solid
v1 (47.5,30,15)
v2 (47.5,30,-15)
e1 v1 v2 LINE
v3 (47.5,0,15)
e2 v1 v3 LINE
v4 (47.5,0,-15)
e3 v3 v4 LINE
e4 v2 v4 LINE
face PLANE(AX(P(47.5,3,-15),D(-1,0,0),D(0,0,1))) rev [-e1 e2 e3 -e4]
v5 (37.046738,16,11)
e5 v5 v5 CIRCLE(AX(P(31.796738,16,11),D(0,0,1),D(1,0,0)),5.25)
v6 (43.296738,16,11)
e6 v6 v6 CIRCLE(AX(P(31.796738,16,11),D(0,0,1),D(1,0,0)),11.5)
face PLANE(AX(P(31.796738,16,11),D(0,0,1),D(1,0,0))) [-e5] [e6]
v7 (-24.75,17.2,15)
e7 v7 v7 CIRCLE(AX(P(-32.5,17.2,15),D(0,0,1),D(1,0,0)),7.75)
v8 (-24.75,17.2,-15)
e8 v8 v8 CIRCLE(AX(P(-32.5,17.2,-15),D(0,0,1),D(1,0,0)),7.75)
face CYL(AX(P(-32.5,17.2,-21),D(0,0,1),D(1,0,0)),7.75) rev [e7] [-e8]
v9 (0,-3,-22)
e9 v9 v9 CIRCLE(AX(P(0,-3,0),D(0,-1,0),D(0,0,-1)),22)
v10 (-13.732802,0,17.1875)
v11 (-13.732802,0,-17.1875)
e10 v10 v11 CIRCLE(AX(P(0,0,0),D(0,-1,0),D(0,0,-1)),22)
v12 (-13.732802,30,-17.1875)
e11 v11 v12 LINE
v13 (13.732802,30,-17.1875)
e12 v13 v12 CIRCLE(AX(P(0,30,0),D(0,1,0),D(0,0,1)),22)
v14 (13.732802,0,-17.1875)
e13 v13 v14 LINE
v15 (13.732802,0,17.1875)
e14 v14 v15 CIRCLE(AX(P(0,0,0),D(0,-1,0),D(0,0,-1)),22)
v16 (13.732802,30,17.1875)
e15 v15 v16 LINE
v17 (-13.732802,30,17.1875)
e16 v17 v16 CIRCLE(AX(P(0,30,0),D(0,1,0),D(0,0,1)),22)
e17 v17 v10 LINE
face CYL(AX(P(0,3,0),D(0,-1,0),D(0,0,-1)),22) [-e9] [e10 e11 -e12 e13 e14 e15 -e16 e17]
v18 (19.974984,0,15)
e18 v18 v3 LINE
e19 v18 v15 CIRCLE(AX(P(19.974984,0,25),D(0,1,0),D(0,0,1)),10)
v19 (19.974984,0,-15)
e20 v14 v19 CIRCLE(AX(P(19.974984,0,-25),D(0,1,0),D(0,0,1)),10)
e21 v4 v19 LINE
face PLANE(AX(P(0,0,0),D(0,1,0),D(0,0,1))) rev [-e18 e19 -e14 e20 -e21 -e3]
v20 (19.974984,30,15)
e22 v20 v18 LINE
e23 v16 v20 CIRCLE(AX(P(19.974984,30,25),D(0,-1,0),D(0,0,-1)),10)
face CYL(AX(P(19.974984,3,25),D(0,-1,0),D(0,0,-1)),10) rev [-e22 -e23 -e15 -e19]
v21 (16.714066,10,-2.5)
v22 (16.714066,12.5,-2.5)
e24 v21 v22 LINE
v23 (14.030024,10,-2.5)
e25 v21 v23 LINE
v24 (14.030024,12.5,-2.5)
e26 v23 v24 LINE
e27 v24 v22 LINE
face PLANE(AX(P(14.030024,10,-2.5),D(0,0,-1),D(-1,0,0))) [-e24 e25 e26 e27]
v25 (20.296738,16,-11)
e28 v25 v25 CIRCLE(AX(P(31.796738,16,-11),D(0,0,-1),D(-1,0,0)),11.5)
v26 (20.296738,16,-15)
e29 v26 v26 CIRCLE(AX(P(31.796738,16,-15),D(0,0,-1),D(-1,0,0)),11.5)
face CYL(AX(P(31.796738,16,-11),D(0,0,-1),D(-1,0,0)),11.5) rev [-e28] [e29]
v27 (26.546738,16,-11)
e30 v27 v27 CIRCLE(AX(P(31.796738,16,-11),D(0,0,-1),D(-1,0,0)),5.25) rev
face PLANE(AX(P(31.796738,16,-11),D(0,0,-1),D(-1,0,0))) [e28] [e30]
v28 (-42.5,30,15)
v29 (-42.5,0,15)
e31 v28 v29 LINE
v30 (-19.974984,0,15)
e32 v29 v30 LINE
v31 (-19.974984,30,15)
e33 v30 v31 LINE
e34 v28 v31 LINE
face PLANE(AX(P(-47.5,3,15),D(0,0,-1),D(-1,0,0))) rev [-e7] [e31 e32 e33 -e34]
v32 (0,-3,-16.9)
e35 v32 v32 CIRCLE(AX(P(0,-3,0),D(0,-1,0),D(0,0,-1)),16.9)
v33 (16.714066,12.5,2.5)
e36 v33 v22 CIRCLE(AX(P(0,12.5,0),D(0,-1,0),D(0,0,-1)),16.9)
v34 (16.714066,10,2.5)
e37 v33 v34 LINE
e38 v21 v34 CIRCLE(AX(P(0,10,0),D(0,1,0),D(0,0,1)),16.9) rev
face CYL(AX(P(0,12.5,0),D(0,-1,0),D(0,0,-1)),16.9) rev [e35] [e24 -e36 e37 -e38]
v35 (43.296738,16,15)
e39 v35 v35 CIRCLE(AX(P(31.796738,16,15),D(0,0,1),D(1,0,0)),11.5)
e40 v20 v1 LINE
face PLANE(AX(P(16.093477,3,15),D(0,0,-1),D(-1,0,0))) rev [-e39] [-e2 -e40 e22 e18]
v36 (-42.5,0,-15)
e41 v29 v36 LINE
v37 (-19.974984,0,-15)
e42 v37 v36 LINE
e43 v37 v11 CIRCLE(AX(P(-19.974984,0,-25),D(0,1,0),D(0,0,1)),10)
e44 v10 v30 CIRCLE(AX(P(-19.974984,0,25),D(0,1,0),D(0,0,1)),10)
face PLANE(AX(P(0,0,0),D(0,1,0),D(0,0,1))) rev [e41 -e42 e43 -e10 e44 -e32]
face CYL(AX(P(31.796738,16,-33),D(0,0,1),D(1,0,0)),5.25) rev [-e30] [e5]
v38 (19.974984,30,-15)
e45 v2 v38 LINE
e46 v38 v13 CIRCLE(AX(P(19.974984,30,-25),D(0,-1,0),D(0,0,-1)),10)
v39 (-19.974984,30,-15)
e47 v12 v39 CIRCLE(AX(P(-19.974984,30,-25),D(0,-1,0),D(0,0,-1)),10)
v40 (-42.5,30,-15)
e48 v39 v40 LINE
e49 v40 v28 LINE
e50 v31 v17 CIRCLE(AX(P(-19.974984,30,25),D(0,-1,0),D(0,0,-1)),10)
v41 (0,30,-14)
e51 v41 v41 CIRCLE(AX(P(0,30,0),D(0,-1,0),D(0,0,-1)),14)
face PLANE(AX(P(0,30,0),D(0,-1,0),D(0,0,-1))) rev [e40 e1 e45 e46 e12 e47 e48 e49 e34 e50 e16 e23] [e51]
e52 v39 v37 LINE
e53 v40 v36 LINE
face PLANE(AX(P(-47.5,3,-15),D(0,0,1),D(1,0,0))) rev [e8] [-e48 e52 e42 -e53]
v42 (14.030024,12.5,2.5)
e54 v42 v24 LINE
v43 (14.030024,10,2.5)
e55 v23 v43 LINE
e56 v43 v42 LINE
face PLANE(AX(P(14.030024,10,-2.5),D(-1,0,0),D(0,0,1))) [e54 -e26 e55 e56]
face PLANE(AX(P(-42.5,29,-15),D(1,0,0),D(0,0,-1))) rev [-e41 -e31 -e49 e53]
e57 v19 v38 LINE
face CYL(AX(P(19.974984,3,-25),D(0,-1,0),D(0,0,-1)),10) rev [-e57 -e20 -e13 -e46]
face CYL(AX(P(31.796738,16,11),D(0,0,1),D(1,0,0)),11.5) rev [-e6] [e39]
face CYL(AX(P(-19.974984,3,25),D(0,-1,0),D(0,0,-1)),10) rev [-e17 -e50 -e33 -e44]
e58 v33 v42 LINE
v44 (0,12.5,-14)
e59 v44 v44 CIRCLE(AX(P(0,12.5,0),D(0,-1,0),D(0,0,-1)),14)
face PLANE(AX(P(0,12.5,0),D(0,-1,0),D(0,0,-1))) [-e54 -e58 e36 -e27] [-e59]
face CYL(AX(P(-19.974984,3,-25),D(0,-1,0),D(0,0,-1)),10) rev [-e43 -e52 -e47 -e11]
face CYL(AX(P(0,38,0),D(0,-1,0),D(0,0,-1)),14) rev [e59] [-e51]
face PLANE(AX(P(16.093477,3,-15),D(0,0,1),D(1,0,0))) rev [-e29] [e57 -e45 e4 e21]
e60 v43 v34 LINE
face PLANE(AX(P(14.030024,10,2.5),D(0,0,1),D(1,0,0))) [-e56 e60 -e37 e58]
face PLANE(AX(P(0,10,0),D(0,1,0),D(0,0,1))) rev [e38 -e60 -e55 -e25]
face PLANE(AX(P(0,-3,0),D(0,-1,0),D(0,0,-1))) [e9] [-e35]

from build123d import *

# Parameters (mm, degrees)
BOSS_EXTRUDE2_DEPTH  = 3
SKETCH3_W            = 20
SKETCH3_H            = 30
BOSS_EXTRUDE5_DEPTH  = 26
SKETCH8_R            = 7.75
CUT_EXTRUDE2_DEPTH   = 36
BOSS_EXTRUDE7_DEPTH  = 27
SKETCH14_R           = 22
BOSS_EXTRUDE8_DEPTH  = 20
SKETCH16_R           = 11.5
CUT_EXTRUDE3_DEPTH   = 4
SKETCH17_R           = 5.25
CUT_EXTRUDE4_DEPTH   = 44
CUT_EXTRUDE5_START   = -4
SKETCH18_R           = 11.5
CUT_EXTRUDE5_DEPTH   = 4
SKETCH24_W           = 6.849841191
SKETCH24_H           = 4
BOSS_EXTRUDE12_DEPTH = 13
SKETCH26_W           = 5
SKETCH26_H           = 30
CUT_EXTRUDE10_DEPTH  = 6
SKETCH27_R           = 22
BOSS_EXTRUDE15_DEPTH = 7
BOSS_EXTRUDE17_DEPTH = 27
SKETCH37_W           = 20
SKETCH37_H           = 30
BOSS_EXTRUDE18_DEPTH = 1
FILLET17_R           = 10
BOSS_EXTRUDE19_START = 3
SKETCH41_R           = 22
BOSS_EXTRUDE19_DEPTH = 3
SKETCH44_W           = 5.842947404
SKETCH44_H           = 4
BOSS_EXTRUDE21_DEPTH = 22
SKETCH46_R           = 16.9
CUT_EXTRUDE11_DEPTH  = 15.5
SKETCH48_R           = 14
CUT_EXTRUDE13_DEPTH  = 25.5
SKETCH49_W           = 5.321549717
SKETCH49_H           = 5
BOSS_EXTRUDE24_DEPTH = 20


with BuildPart() as part:
    # Sketch1 → Boss-Extrude2 (new body)
    with BuildSketch(Plane(origin=(0, 0, 0), x_dir=(1, 0, 0), z_dir=(0, 1, 0))):
        with BuildLine():
            Line((16.093476939, 15), (47.5, 15))
            Line((47.5, 15), (47.5, -15))
            Line((47.5, -15), (16.093476939, -15))
            ThreePointArc((16.093476939, -15), (0, -22), (-16.093476939, -15))
            Line((-16.093476939, -15), (-47.5, -15))
            Line((-47.5, -15), (-47.5, 15))
            Line((-47.5, 15), (-16.093476939, 15))
            ThreePointArc((-16.093476939, 15), (0, 22), (16.093476939, 15))
        make_face()
    extrude(amount=BOSS_EXTRUDE2_DEPTH)

    # Sketch3 → Boss-Extrude5 (add)
    with BuildSketch(Plane(origin=(0, 3, 0), x_dir=(1, 0, 0), z_dir=(0, 1, 0))):
        with Locations((-32.5, 0)):
            Rectangle(SKETCH3_W, SKETCH3_H)
    extrude(amount=BOSS_EXTRUDE5_DEPTH)

    # Sketch8 → Cut-Extrude2 (cut)
    with BuildSketch(Plane.XY.offset(15)):
        with Locations((-32.5, 17.2)):
            Circle(SKETCH8_R)
    extrude(amount=-CUT_EXTRUDE2_DEPTH, mode=Mode.SUBTRACT)

    # Sketch9 → Boss-Extrude7 (add)
    with BuildSketch(Plane(origin=(0, 3, 0), x_dir=(1, 0, 0), z_dir=(0, 1, 0))):
        with BuildLine():
            Line((16.093476939, 15), (47.5, 15))
            Line((47.5, 15), (47.5, -15))
            Line((47.5, -15), (16.093476939, -15))
            ThreePointArc((16.093476939, -15), (22, 0), (16.093476939, 15))
        make_face()
    extrude(amount=BOSS_EXTRUDE7_DEPTH)

    # Sketch14 → Boss-Extrude8 (add)
    with BuildSketch(Plane(origin=(0, 3, 0), x_dir=(1, 0, 0), z_dir=(0, 1, 0))):
        Circle(SKETCH14_R)
    extrude(amount=BOSS_EXTRUDE8_DEPTH)

    # Sketch16 → Cut-Extrude3 (cut)
    with BuildSketch(Plane.XY.offset(15)):
        with Locations((31.79673847, 16)):
            Circle(SKETCH16_R)
    extrude(amount=-CUT_EXTRUDE3_DEPTH, mode=Mode.SUBTRACT)

    # Sketch17 → Cut-Extrude4 (cut)
    with BuildSketch(Plane.XY.offset(11)):
        with Locations((31.79673847, 16)):
            Circle(SKETCH17_R)
    extrude(amount=-CUT_EXTRUDE4_DEPTH, mode=Mode.SUBTRACT)

    # Sketch18 → Cut-Extrude5 (cut)
    with BuildSketch(Plane(origin=(0, 0, -15), x_dir=(-1, 0, 0), z_dir=(0, 0, -1)).offset(CUT_EXTRUDE5_START)):
        with Locations(Location((-31.79673847, 16, 0), (0, 0, 180))):
            Circle(SKETCH18_R)
    extrude(amount=CUT_EXTRUDE5_DEPTH, mode=Mode.SUBTRACT)

    # Sketch24 → Boss-Extrude12 (add)
    with BuildSketch(Plane(origin=(0, 23, 0), x_dir=(1, 0, 0), z_dir=(0, 1, 0))):
        with Locations((17.924920596, 0)):
            Rectangle(SKETCH24_W, SKETCH24_H)
    extrude(amount=-BOSS_EXTRUDE12_DEPTH)

    # Sketch26 → Cut-Extrude10 (cut)
    with BuildSketch(Plane(origin=(0, 3, 0), x_dir=(1, 0, 0), z_dir=(0, 1, 0))):
        with Locations((-45, 0)):
            Rectangle(SKETCH26_W, SKETCH26_H)
    extrude(amount=-CUT_EXTRUDE10_DEPTH, mode=Mode.SUBTRACT)

    # Sketch27 → Boss-Extrude15 (add)
    with BuildSketch(Plane(origin=(0, 23, 0), x_dir=(1, 0, 0), z_dir=(0, 1, 0))):
        Circle(SKETCH27_R)
    extrude(amount=BOSS_EXTRUDE15_DEPTH)

    # Sketch36 → Boss-Extrude17 (add)
    with BuildSketch(Plane(origin=(0, 3, 0), x_dir=(1, 0, 0), z_dir=(0, 1, 0))):
        with BuildLine():
            Line((-16.093476939, -15), (-22.5, -15))
            Line((-22.5, -15), (-22.5, 15))
            Line((-22.5, 15), (-16.093476939, 15))
            ThreePointArc((-16.093476939, 15), (-22, 0), (-16.093476939, -15))
        make_face()
    extrude(amount=BOSS_EXTRUDE17_DEPTH)

    # Sketch37 → Boss-Extrude18 (add)
    with BuildSketch(Plane(origin=(0, 29, 0), x_dir=(1, 0, 0), z_dir=(0, 1, 0))):
        with Locations((-32.5, 0)):
            Rectangle(SKETCH37_W, SKETCH37_H)
    extrude(amount=BOSS_EXTRUDE18_DEPTH)

    # Fillet17
    # the kernel refuses this fillet: 10 mm, written as the material it adds along each edge
    with BuildSketch(Plane(origin=(16.093476939, 3, 15), x_dir=(-0.7334988970942886, 0, 0.67969064136669), z_dir=(0, 1, 0))) as fillet17_piece_1:
        with BuildLine():
            CenterArc((3.949825005, 9.973213236), FILLET17_R, 227.180526604, 38.624832873)
            Line((-2.847081409, 2.638224265), (0, 0))
            ThreePointArc((0, 0), (1.609187965, 0.058930881), (3.21837593, 0))
        make_face()
    extrude(amount=20)
    with BuildSketch(Plane(origin=(-16.093476939, 3, 15), x_dir=(-1, 0, 0), z_dir=(0, 1, 0)), Plane(origin=(16.093476939, 3, -15), x_dir=(1, 0, 0), z_dir=(0, 1, 0))) as fillet17_piece_2:
        with BuildLine():
            CenterArc((3.881507416, 10), FILLET17_R, 231.375167127, 38.624832873)
            ThreePointArc((-2.360675195, 2.1875), (-1.140282829, 1.136975736), (0, 0))
            Line((0, 0), (3.881507416, 0))
        make_face()
    extrude(amount=20)
    with BuildSketch(Plane(origin=(-16.093476939, 3, -15), x_dir=(-1, 0, 0), z_dir=(0, 1, 0))) as fillet17_piece_3:
        with BuildLine():
            CenterArc((3.881507416, -10), FILLET17_R, 90, 38.624832873)
            ThreePointArc((-2.360675195, -2.1875), (-1.140282829, -1.136975736), (0, 0))
            Line((0, 0), (3.881507416, 0))
        make_face()
    extrude(amount=20)
    with BuildSketch(Plane(origin=(16.093476939, 0, -15), x_dir=(1, 0, 0), z_dir=(0, 1, 0)), Plane(origin=(-16.093476939, 0, 15), x_dir=(-1, 0, 0), z_dir=(0, 1, 0))) as fillet17_piece_4:
        with BuildLine():
            CenterArc((3.881507416, 10), FILLET17_R, 231.375167127, 38.624832873)
            ThreePointArc((-2.360675195, 2.1875), (-1.140282829, 1.136975736), (0, 0))
            Line((0, 0), (3.881507416, 0))
        make_face()
    extrude(amount=3)
    with BuildSketch(Plane(origin=(16.093476939, 23, -15), x_dir=(1, 0, 0), z_dir=(0, 1, 0)), Plane(origin=(-16.093476939, 23, 15), x_dir=(-1, 0, 0), z_dir=(0, 1, 0))) as fillet17_piece_5:
        with BuildLine():
            CenterArc((3.881507416, 10), FILLET17_R, 231.375167127, 38.624832873)
            ThreePointArc((-2.360675195, 2.1875), (-1.140282829, 1.136975736), (0, 0))
            Line((0, 0), (3.881507416, 0))
        make_face()
    extrude(amount=7)
    with BuildSketch(Plane(origin=(-16.093476939, 0, -15), x_dir=(0.7334988970942858, 0, -0.6796906413666929), z_dir=(0, 1, 0)), Plane(origin=(16.093476939, 0, 15), x_dir=(-0.7334988970942886, 0, 0.6796906413666898), z_dir=(0, 1, 0))) as fillet17_piece_6:
        with BuildLine():
            CenterArc((3.949825005, 9.973213236), FILLET17_R, 227.180526604, 38.624832873)
            Line((-2.847081409, 2.638224265), (0, 0))
            ThreePointArc((0, 0), (1.609187965, 0.058930881), (3.21837593, 0))
        make_face()
    extrude(amount=3)
    with BuildSketch(Plane(origin=(-16.093476939, 23, -15), x_dir=(-1, 0, 0), z_dir=(0, 1, 0))) as fillet17_piece_7:
        with BuildLine():
            CenterArc((3.881507416, -10), FILLET17_R, 90, 38.624832873)
            ThreePointArc((-2.360675195, -2.1875), (-1.140282829, -1.136975736), (0, 0))
            Line((0, 0), (3.881507416, 0))
        make_face()
    extrude(amount=7)
    with BuildSketch(Plane(origin=(16.093476939, 23, 15), x_dir=(-0.7334988970942886, 0, 0.67969064136669), z_dir=(0, 1, 0))) as fillet17_piece_8:
        with BuildLine():
            CenterArc((3.949825005, 9.973213236), FILLET17_R, 227.180526604, 38.624832873)
            Line((-2.847081409, 2.638224265), (0, 0))
            ThreePointArc((0, 0), (1.609187965, 0.058930881), (3.21837593, 0))
        make_face()
    extrude(amount=7)

    # Sketch41 → Boss-Extrude19 (add)
    with BuildSketch(Plane.XZ.offset(BOSS_EXTRUDE19_START)):
        with Locations(Location((0, 0, 0), (0, 0, 270))):
            Circle(SKETCH41_R)
    extrude(amount=-BOSS_EXTRUDE19_DEPTH)

    # Sketch44 → Boss-Extrude21 (add)
    with BuildSketch(Plane(origin=(0, 30, 0), x_dir=(1, 0, 0), z_dir=(0, 1, 0))):
        with Locations((16.9, 0)):
            Rectangle(SKETCH44_W, SKETCH44_H)
    extrude(amount=-BOSS_EXTRUDE21_DEPTH)

    # Sketch46 → Cut-Extrude11 (cut)
    with BuildSketch(Plane.XZ.offset(3)):
        with Locations(Location((0, 0, 0), (0, 0, 270))):
            Circle(SKETCH46_R)
    extrude(amount=-CUT_EXTRUDE11_DEPTH, mode=Mode.SUBTRACT)

    # Sketch48 → Cut-Extrude13 (cut)
    with BuildSketch(Plane.XZ.offset(-12.5)):
        with Locations(Location((0, 0, 0), (0, 0, 270))):
            Circle(SKETCH48_R)
    extrude(amount=-CUT_EXTRUDE13_DEPTH, mode=Mode.SUBTRACT)

    # Sketch49 → Boss-Extrude24 (add)
    with BuildSketch(Plane(origin=(0, 30, 0), x_dir=(1, 0, 0), z_dir=(0, 1, 0))):
        with Locations((16.690799244, 0)):
            Rectangle(SKETCH49_W, SKETCH49_H)
    extrude(amount=-BOSS_EXTRUDE24_DEPTH)


solid = part.part
